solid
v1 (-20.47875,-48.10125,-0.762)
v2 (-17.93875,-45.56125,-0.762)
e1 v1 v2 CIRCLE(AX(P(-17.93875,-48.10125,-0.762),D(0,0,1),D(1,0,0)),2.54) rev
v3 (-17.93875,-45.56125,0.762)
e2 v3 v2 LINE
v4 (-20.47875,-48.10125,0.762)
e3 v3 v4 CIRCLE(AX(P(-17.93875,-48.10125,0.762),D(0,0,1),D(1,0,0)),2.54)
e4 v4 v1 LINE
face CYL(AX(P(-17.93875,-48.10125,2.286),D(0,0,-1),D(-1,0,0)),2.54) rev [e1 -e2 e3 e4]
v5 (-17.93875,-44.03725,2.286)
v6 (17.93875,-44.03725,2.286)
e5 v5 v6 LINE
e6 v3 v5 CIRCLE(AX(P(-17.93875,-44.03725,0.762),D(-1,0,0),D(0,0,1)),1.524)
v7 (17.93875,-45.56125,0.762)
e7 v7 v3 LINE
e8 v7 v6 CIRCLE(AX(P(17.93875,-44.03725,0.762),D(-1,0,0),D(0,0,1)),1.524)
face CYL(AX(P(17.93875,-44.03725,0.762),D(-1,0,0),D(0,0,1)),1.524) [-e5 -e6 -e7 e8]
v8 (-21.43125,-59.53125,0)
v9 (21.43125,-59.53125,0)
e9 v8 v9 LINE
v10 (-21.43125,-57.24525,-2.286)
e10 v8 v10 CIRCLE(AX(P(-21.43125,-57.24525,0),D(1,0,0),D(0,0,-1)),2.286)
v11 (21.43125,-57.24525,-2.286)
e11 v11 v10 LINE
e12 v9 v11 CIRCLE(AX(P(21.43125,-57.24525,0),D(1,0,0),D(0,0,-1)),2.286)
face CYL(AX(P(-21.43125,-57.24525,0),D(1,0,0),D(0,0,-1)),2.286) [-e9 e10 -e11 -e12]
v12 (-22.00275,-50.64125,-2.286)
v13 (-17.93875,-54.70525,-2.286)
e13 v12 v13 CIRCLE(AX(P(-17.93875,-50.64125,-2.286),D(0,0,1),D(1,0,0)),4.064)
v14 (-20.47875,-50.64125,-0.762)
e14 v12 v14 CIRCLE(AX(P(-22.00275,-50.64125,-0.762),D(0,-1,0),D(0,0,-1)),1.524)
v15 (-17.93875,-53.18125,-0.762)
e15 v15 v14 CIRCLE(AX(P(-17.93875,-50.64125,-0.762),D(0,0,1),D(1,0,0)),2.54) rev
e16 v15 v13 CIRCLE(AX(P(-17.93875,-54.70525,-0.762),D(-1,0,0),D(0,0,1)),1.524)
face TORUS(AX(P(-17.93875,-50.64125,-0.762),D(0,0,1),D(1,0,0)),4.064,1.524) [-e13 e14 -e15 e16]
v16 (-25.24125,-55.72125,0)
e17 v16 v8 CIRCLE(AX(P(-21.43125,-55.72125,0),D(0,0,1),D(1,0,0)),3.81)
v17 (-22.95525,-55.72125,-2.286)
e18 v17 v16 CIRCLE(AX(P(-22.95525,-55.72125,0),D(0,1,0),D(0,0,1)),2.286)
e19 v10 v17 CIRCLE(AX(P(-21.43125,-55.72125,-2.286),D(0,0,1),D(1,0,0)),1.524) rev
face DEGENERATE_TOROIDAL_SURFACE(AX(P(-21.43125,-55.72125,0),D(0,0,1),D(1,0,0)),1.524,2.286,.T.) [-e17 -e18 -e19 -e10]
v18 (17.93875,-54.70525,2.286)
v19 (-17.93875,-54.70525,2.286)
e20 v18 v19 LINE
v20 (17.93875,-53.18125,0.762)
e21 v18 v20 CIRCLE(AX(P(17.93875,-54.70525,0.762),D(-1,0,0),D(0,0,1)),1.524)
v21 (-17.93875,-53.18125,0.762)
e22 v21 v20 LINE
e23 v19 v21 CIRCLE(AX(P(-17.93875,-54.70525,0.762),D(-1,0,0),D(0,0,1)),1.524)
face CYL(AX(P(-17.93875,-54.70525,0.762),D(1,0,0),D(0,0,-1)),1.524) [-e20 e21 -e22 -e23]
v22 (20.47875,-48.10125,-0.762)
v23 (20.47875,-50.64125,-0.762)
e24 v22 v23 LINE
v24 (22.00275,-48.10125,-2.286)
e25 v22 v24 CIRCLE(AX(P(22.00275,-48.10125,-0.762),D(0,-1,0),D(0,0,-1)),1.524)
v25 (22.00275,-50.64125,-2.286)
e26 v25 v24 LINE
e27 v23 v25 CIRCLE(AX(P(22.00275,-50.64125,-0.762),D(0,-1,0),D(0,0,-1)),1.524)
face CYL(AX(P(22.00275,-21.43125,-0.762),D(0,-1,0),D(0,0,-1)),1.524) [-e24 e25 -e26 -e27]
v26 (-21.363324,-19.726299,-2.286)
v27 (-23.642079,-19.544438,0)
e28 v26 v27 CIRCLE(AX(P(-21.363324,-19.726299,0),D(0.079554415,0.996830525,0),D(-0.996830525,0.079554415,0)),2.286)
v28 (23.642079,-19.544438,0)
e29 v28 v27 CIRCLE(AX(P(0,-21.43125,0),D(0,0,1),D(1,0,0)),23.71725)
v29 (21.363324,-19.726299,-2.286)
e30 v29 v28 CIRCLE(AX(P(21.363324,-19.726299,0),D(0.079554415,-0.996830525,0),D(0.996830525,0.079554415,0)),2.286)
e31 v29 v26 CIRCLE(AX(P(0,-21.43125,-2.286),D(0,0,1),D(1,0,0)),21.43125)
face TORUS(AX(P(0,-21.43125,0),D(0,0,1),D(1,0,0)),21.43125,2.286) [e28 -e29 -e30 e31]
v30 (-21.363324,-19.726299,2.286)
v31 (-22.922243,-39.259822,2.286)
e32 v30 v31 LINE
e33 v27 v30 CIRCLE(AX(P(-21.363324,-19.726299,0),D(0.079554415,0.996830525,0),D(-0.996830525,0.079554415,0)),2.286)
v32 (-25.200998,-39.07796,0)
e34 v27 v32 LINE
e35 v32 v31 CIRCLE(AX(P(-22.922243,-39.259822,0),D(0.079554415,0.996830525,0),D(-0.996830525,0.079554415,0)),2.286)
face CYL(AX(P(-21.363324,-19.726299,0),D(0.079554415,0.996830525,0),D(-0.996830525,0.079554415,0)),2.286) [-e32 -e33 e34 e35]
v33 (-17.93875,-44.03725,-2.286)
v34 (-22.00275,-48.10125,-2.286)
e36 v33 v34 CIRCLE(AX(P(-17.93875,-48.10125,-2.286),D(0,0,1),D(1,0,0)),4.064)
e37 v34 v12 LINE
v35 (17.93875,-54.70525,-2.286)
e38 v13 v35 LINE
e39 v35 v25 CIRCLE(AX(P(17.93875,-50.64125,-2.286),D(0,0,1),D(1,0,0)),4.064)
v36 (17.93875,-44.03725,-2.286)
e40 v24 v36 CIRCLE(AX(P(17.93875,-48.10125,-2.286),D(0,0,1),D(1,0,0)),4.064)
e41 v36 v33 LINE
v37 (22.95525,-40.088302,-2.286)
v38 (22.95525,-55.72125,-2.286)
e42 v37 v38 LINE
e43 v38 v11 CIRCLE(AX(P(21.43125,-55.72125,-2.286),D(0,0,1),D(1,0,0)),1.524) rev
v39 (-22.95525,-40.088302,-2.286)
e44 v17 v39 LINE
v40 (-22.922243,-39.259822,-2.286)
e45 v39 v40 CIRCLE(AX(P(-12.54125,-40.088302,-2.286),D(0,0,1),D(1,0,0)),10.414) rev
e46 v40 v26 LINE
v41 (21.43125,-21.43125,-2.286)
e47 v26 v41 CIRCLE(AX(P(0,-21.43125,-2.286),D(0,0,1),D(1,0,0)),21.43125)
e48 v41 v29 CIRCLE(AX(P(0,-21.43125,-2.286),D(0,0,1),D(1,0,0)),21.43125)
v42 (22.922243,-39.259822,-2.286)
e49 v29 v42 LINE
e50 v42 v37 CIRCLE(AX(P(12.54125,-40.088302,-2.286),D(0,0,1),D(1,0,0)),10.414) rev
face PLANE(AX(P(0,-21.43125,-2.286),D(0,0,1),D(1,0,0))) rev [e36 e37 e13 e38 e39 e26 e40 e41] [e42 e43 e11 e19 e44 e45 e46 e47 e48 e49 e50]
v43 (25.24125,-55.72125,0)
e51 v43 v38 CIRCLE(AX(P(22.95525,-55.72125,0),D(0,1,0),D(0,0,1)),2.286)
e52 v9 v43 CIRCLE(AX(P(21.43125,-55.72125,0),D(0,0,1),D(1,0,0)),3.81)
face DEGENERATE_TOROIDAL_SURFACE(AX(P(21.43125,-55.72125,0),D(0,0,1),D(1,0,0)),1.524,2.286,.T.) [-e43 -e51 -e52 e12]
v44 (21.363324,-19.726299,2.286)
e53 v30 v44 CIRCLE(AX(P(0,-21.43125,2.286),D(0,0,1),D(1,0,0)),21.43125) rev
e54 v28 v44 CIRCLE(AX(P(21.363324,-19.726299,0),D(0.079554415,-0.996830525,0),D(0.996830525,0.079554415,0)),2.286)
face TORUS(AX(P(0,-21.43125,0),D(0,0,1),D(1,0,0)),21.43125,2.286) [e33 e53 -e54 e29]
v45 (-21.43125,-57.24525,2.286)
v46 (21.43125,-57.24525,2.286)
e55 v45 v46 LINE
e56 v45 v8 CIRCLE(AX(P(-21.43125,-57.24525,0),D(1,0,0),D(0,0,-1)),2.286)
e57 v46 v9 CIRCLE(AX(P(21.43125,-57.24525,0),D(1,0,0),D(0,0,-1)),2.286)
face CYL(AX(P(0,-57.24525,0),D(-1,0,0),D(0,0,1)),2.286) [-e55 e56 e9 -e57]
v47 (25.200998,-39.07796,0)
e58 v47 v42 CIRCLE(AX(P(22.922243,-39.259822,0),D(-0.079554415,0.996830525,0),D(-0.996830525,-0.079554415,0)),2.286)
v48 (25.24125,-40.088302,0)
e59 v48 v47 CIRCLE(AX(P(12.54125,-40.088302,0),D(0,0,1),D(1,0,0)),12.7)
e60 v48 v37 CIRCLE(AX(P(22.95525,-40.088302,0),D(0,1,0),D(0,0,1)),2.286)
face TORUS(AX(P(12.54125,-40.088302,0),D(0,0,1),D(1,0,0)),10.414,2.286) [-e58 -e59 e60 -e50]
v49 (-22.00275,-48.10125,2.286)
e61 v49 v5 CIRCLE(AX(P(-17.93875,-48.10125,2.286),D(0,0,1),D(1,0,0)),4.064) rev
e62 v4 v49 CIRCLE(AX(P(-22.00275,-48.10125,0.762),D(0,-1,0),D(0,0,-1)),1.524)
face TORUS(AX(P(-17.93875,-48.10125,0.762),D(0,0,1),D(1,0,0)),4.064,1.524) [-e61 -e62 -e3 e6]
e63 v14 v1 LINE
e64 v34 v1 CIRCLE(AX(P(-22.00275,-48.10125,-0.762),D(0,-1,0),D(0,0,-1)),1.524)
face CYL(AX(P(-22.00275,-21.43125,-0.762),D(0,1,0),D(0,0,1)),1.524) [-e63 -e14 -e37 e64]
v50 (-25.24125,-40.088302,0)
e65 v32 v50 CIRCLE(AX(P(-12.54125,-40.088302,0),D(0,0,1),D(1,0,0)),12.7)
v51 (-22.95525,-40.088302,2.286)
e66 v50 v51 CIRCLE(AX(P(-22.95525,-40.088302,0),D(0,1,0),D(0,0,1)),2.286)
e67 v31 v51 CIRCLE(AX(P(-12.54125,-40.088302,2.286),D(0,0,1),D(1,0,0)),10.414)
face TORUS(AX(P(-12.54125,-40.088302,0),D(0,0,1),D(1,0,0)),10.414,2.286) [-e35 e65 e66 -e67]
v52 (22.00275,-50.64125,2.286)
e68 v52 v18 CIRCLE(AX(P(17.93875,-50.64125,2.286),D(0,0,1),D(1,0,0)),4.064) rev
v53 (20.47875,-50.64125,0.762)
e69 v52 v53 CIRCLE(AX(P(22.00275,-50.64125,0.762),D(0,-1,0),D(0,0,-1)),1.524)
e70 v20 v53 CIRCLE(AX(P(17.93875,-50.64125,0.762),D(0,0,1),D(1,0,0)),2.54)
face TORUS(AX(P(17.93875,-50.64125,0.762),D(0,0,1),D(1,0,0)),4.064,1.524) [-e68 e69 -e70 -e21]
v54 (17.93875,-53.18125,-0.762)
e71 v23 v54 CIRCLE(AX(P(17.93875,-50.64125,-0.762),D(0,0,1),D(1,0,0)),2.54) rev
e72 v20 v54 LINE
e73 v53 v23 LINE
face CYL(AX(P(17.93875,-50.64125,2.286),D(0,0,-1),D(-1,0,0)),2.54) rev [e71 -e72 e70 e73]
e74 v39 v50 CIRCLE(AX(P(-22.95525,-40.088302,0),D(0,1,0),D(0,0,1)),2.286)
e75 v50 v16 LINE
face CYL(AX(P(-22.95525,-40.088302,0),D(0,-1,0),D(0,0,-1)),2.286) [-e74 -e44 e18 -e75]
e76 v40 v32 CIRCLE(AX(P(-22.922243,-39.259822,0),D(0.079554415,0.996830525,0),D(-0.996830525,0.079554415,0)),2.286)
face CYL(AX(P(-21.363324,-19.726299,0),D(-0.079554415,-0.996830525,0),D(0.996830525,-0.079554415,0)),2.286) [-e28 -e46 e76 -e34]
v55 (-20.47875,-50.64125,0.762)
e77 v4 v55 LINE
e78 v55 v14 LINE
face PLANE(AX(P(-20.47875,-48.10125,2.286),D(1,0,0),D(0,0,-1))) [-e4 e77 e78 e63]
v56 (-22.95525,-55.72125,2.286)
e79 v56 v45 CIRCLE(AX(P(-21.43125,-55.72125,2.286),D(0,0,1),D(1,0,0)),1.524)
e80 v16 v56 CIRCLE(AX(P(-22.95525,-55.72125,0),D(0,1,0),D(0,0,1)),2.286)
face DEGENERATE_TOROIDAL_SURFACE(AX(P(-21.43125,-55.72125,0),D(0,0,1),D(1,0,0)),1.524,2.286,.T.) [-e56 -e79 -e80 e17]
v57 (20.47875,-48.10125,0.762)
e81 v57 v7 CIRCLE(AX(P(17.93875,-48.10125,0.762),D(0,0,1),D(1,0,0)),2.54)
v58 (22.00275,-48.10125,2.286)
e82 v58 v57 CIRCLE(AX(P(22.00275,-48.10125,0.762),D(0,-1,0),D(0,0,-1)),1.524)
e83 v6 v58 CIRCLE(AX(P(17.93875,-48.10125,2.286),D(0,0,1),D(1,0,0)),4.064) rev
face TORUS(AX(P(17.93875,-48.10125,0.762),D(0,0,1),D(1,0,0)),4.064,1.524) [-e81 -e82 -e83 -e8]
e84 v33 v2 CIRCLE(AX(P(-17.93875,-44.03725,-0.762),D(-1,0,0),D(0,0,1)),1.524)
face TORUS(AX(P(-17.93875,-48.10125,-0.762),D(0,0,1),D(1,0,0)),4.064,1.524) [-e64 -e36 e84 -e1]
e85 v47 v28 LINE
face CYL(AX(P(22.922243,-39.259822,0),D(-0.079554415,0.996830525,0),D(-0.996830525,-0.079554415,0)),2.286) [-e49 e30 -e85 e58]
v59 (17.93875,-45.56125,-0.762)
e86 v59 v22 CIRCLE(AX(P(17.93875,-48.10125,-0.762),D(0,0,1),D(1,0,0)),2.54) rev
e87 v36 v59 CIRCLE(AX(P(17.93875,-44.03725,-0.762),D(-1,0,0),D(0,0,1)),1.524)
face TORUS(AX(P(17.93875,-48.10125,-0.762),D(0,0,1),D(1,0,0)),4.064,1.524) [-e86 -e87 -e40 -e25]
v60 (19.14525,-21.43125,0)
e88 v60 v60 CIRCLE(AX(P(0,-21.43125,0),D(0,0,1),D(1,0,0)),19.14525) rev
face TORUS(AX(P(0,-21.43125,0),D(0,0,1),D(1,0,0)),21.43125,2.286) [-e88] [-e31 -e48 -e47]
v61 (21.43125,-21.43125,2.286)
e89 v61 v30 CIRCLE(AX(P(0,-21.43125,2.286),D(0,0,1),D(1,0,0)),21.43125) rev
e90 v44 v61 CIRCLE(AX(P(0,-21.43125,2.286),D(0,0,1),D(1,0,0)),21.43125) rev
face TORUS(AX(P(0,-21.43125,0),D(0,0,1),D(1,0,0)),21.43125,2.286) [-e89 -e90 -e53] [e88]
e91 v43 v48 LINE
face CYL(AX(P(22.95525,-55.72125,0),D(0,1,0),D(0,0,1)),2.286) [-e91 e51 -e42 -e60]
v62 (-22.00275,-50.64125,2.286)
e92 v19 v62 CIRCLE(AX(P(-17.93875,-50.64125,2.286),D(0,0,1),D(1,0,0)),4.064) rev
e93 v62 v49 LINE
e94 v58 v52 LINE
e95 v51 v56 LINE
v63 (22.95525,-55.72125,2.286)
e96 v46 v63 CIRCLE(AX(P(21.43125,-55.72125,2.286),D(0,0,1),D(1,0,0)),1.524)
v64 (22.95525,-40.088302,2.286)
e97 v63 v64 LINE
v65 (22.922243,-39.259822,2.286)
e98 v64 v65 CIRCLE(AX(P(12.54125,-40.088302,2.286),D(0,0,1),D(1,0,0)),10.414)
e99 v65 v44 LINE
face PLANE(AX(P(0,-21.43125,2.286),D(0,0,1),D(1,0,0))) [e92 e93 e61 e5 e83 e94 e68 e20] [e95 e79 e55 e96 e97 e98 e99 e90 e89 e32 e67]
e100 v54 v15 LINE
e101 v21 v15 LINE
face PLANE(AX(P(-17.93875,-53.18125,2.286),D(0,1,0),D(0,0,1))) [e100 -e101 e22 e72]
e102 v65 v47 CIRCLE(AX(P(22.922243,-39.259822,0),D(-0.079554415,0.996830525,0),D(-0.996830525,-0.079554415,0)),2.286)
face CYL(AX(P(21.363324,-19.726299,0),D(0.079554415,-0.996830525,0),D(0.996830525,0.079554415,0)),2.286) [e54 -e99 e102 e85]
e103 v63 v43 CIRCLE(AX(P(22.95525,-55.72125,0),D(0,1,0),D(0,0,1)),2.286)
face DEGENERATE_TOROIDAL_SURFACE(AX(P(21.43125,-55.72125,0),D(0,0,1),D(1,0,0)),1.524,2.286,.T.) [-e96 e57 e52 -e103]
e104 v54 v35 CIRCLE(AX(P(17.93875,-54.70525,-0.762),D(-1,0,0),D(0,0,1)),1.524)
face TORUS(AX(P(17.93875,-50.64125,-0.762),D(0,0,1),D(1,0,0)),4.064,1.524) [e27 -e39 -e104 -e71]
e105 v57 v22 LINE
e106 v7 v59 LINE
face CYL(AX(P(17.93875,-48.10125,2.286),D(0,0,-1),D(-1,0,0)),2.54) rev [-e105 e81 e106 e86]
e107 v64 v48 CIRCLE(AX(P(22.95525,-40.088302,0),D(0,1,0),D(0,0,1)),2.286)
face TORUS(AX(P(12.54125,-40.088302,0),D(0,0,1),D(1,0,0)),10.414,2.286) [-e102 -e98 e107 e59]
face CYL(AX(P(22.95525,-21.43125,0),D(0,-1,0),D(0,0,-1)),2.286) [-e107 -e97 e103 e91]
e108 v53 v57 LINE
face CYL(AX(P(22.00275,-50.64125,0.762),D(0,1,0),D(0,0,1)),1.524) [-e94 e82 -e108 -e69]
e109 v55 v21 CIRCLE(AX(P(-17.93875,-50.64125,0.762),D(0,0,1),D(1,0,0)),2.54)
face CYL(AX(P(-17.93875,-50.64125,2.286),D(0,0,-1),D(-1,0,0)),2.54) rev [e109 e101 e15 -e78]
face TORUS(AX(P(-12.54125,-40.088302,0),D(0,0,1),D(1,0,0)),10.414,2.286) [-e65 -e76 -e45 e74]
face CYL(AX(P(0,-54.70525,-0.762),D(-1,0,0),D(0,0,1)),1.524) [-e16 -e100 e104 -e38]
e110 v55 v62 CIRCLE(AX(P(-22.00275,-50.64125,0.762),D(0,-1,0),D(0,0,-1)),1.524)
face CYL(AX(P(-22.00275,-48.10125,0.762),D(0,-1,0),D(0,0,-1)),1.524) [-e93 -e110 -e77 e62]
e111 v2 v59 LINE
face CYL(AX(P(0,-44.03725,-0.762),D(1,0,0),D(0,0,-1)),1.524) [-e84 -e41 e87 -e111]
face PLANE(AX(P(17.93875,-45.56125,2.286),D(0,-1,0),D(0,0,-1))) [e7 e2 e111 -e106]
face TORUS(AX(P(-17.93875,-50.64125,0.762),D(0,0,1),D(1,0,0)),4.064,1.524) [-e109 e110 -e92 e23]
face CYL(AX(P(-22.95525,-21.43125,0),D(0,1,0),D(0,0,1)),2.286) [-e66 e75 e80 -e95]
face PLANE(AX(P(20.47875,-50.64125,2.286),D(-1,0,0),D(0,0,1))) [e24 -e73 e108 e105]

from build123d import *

# Parameters (mm, degrees)
SKETCH2_R                = 2.286
BOSS_EXTRUDE1_DEPTH      = 2.286
BOSS_EXTRUDE1_DEPTH_BACK = 2.286
SKETCH4_R                = 19.14525
FILLET1_R                = 2.286
FILLET2_R                = 1.524


with BuildPart() as part:
    # Sweep1: sweep along a path in Sketch3
    with BuildLine(Plane.XY) as sweep1_path:
        CenterArc((0, -21.43125), 21.43125, 0, 360)
    # Sketch2 → Sweep1 (sweep)
    with BuildSketch(Plane(origin=(0, 0, 0), x_dir=(0, 0, -1), z_dir=(1, 0, 0))):
        Circle(SKETCH2_R)
    sweep(path=sweep1_path.line)

    # Sketch4 → Boss-Extrude1 (add, two sides: drawn at the far end of the back side and taken through both)
    with BuildSketch(Plane.XY.offset(-BOSS_EXTRUDE1_DEPTH_BACK)):
        with BuildLine():
            Line((-23.642078763, -19.544438056), (-25.200997664, -39.077960491))
            ThreePointArc((-25.200997664, -39.077960491), (-25.231182926, -39.582730267), (-25.24125, -40.088301559))
            Line((-25.24125, -40.088301559), (-25.24125, -55.72125))
            ThreePointArc((-25.24125, -55.72125), (-24.125326836, -58.415326836), (-21.43125, -59.53125))
            Line((-21.43125, -59.53125), (21.43125, -59.53125))
            ThreePointArc((21.43125, -59.53125), (24.125326836, -58.415326836), (25.24125, -55.72125))
            Line((25.24125, -55.72125), (25.24125, -40.088301559))
            ThreePointArc((25.24125, -40.088301559), (25.231182926, -39.582730267), (25.200997664, -39.077960491))
            Line((25.200997664, -39.077960491), (23.642078763, -19.544438056))
            ThreePointArc((23.642078763, -19.544438056), (0, 2.286), (-23.642078763, -19.544438056))
        make_face()
        with Locations((0, -21.43125)):
            Circle(SKETCH4_R, mode=Mode.SUBTRACT)
        with BuildLine():
            Line((-20.47875, -48.10125), (-20.47875, -50.64125))
            ThreePointArc((-20.47875, -50.64125), (-19.734801224, -52.437301224), (-17.93875, -53.18125))
            Line((-17.93875, -53.18125), (17.93875, -53.18125))
            ThreePointArc((17.93875, -53.18125), (19.734801224, -52.437301224), (20.47875, -50.64125))
            Line((20.47875, -50.64125), (20.47875, -48.10125))
            ThreePointArc((20.47875, -48.10125), (19.734801224, -46.305198776), (17.93875, -45.56125))
            Line((17.93875, -45.56125), (-17.93875, -45.56125))
            ThreePointArc((-17.93875, -45.56125), (-19.734801224, -46.305198776), (-20.47875, -48.10125))
        make_face(mode=Mode.SUBTRACT)
    extrude(amount=BOSS_EXTRUDE1_DEPTH + BOSS_EXTRUDE1_DEPTH_BACK)

    # Fillet1
    fillet1_edges = [part.edges().sort_by_distance(p)[0] for p in [
        (24.421538214, -29.311199273, 2.286),
        (25.231182926, -39.582730267, 2.286),
        (25.24125, -47.904775779, 2.286),
        (24.125326836, -58.415326836, 2.286),
        (0, -59.53125, 2.286),
        (-24.125326836, -58.415326836, 2.286),
        (-25.24125, -47.904775779, 2.286),
        (-25.231182926, -39.582730267, 2.286),
        (-24.421538214, -29.311199273, 2.286),
        (24.421538214, -29.311199273, -2.286),
        (25.231182926, -39.582730267, -2.286),
        (25.24125, -47.904775779, -2.286),
        (24.125326836, -58.415326836, -2.286),
        (0, -59.53125, -2.286),
        (-24.125326836, -58.415326836, -2.286),
        (-25.24125, -47.904775779, -2.286),
        (-25.231182926, -39.582730267, -2.286),
        (-24.421538214, -29.311199273, -2.286),
        (-19.14525, -21.43125, 2.286),
        (-19.14525, -21.43125, -2.286),
        (0, 2.286, 2.286),
        (0, 2.286, -2.286),
    ]]
    fillet(fillet1_edges, radius=FILLET1_R - 0.0001)  # a hair under: the kernel refuses the full size

    # Fillet2
    fillet2_edges = [part.edges().sort_by_distance(p)[0] for p in [
        (19.734801224, -46.305198776, 2.286),
        (0, -45.56125, 2.286),
        (-19.734801224, -46.305198776, 2.286),
        (-20.47875, -49.37125, 2.286),
        (-19.734801224, -52.437301224, 2.286),
        (0, -53.18125, 2.286),
        (19.734801224, -52.437301224, 2.286),
        (20.47875, -49.37125, 2.286),
        (20.47875, -49.37125, -2.286),
        (19.734801224, -46.305198776, -2.286),
        (0, -45.56125, -2.286),
        (-19.734801224, -46.305198776, -2.286),
        (-20.47875, -49.37125, -2.286),
        (-19.734801224, -52.437301224, -2.286),
        (0, -53.18125, -2.286),
        (19.734801224, -52.437301224, -2.286),
    ]]
    fillet(fillet2_edges, radius=FILLET2_R)


solid = part.part
